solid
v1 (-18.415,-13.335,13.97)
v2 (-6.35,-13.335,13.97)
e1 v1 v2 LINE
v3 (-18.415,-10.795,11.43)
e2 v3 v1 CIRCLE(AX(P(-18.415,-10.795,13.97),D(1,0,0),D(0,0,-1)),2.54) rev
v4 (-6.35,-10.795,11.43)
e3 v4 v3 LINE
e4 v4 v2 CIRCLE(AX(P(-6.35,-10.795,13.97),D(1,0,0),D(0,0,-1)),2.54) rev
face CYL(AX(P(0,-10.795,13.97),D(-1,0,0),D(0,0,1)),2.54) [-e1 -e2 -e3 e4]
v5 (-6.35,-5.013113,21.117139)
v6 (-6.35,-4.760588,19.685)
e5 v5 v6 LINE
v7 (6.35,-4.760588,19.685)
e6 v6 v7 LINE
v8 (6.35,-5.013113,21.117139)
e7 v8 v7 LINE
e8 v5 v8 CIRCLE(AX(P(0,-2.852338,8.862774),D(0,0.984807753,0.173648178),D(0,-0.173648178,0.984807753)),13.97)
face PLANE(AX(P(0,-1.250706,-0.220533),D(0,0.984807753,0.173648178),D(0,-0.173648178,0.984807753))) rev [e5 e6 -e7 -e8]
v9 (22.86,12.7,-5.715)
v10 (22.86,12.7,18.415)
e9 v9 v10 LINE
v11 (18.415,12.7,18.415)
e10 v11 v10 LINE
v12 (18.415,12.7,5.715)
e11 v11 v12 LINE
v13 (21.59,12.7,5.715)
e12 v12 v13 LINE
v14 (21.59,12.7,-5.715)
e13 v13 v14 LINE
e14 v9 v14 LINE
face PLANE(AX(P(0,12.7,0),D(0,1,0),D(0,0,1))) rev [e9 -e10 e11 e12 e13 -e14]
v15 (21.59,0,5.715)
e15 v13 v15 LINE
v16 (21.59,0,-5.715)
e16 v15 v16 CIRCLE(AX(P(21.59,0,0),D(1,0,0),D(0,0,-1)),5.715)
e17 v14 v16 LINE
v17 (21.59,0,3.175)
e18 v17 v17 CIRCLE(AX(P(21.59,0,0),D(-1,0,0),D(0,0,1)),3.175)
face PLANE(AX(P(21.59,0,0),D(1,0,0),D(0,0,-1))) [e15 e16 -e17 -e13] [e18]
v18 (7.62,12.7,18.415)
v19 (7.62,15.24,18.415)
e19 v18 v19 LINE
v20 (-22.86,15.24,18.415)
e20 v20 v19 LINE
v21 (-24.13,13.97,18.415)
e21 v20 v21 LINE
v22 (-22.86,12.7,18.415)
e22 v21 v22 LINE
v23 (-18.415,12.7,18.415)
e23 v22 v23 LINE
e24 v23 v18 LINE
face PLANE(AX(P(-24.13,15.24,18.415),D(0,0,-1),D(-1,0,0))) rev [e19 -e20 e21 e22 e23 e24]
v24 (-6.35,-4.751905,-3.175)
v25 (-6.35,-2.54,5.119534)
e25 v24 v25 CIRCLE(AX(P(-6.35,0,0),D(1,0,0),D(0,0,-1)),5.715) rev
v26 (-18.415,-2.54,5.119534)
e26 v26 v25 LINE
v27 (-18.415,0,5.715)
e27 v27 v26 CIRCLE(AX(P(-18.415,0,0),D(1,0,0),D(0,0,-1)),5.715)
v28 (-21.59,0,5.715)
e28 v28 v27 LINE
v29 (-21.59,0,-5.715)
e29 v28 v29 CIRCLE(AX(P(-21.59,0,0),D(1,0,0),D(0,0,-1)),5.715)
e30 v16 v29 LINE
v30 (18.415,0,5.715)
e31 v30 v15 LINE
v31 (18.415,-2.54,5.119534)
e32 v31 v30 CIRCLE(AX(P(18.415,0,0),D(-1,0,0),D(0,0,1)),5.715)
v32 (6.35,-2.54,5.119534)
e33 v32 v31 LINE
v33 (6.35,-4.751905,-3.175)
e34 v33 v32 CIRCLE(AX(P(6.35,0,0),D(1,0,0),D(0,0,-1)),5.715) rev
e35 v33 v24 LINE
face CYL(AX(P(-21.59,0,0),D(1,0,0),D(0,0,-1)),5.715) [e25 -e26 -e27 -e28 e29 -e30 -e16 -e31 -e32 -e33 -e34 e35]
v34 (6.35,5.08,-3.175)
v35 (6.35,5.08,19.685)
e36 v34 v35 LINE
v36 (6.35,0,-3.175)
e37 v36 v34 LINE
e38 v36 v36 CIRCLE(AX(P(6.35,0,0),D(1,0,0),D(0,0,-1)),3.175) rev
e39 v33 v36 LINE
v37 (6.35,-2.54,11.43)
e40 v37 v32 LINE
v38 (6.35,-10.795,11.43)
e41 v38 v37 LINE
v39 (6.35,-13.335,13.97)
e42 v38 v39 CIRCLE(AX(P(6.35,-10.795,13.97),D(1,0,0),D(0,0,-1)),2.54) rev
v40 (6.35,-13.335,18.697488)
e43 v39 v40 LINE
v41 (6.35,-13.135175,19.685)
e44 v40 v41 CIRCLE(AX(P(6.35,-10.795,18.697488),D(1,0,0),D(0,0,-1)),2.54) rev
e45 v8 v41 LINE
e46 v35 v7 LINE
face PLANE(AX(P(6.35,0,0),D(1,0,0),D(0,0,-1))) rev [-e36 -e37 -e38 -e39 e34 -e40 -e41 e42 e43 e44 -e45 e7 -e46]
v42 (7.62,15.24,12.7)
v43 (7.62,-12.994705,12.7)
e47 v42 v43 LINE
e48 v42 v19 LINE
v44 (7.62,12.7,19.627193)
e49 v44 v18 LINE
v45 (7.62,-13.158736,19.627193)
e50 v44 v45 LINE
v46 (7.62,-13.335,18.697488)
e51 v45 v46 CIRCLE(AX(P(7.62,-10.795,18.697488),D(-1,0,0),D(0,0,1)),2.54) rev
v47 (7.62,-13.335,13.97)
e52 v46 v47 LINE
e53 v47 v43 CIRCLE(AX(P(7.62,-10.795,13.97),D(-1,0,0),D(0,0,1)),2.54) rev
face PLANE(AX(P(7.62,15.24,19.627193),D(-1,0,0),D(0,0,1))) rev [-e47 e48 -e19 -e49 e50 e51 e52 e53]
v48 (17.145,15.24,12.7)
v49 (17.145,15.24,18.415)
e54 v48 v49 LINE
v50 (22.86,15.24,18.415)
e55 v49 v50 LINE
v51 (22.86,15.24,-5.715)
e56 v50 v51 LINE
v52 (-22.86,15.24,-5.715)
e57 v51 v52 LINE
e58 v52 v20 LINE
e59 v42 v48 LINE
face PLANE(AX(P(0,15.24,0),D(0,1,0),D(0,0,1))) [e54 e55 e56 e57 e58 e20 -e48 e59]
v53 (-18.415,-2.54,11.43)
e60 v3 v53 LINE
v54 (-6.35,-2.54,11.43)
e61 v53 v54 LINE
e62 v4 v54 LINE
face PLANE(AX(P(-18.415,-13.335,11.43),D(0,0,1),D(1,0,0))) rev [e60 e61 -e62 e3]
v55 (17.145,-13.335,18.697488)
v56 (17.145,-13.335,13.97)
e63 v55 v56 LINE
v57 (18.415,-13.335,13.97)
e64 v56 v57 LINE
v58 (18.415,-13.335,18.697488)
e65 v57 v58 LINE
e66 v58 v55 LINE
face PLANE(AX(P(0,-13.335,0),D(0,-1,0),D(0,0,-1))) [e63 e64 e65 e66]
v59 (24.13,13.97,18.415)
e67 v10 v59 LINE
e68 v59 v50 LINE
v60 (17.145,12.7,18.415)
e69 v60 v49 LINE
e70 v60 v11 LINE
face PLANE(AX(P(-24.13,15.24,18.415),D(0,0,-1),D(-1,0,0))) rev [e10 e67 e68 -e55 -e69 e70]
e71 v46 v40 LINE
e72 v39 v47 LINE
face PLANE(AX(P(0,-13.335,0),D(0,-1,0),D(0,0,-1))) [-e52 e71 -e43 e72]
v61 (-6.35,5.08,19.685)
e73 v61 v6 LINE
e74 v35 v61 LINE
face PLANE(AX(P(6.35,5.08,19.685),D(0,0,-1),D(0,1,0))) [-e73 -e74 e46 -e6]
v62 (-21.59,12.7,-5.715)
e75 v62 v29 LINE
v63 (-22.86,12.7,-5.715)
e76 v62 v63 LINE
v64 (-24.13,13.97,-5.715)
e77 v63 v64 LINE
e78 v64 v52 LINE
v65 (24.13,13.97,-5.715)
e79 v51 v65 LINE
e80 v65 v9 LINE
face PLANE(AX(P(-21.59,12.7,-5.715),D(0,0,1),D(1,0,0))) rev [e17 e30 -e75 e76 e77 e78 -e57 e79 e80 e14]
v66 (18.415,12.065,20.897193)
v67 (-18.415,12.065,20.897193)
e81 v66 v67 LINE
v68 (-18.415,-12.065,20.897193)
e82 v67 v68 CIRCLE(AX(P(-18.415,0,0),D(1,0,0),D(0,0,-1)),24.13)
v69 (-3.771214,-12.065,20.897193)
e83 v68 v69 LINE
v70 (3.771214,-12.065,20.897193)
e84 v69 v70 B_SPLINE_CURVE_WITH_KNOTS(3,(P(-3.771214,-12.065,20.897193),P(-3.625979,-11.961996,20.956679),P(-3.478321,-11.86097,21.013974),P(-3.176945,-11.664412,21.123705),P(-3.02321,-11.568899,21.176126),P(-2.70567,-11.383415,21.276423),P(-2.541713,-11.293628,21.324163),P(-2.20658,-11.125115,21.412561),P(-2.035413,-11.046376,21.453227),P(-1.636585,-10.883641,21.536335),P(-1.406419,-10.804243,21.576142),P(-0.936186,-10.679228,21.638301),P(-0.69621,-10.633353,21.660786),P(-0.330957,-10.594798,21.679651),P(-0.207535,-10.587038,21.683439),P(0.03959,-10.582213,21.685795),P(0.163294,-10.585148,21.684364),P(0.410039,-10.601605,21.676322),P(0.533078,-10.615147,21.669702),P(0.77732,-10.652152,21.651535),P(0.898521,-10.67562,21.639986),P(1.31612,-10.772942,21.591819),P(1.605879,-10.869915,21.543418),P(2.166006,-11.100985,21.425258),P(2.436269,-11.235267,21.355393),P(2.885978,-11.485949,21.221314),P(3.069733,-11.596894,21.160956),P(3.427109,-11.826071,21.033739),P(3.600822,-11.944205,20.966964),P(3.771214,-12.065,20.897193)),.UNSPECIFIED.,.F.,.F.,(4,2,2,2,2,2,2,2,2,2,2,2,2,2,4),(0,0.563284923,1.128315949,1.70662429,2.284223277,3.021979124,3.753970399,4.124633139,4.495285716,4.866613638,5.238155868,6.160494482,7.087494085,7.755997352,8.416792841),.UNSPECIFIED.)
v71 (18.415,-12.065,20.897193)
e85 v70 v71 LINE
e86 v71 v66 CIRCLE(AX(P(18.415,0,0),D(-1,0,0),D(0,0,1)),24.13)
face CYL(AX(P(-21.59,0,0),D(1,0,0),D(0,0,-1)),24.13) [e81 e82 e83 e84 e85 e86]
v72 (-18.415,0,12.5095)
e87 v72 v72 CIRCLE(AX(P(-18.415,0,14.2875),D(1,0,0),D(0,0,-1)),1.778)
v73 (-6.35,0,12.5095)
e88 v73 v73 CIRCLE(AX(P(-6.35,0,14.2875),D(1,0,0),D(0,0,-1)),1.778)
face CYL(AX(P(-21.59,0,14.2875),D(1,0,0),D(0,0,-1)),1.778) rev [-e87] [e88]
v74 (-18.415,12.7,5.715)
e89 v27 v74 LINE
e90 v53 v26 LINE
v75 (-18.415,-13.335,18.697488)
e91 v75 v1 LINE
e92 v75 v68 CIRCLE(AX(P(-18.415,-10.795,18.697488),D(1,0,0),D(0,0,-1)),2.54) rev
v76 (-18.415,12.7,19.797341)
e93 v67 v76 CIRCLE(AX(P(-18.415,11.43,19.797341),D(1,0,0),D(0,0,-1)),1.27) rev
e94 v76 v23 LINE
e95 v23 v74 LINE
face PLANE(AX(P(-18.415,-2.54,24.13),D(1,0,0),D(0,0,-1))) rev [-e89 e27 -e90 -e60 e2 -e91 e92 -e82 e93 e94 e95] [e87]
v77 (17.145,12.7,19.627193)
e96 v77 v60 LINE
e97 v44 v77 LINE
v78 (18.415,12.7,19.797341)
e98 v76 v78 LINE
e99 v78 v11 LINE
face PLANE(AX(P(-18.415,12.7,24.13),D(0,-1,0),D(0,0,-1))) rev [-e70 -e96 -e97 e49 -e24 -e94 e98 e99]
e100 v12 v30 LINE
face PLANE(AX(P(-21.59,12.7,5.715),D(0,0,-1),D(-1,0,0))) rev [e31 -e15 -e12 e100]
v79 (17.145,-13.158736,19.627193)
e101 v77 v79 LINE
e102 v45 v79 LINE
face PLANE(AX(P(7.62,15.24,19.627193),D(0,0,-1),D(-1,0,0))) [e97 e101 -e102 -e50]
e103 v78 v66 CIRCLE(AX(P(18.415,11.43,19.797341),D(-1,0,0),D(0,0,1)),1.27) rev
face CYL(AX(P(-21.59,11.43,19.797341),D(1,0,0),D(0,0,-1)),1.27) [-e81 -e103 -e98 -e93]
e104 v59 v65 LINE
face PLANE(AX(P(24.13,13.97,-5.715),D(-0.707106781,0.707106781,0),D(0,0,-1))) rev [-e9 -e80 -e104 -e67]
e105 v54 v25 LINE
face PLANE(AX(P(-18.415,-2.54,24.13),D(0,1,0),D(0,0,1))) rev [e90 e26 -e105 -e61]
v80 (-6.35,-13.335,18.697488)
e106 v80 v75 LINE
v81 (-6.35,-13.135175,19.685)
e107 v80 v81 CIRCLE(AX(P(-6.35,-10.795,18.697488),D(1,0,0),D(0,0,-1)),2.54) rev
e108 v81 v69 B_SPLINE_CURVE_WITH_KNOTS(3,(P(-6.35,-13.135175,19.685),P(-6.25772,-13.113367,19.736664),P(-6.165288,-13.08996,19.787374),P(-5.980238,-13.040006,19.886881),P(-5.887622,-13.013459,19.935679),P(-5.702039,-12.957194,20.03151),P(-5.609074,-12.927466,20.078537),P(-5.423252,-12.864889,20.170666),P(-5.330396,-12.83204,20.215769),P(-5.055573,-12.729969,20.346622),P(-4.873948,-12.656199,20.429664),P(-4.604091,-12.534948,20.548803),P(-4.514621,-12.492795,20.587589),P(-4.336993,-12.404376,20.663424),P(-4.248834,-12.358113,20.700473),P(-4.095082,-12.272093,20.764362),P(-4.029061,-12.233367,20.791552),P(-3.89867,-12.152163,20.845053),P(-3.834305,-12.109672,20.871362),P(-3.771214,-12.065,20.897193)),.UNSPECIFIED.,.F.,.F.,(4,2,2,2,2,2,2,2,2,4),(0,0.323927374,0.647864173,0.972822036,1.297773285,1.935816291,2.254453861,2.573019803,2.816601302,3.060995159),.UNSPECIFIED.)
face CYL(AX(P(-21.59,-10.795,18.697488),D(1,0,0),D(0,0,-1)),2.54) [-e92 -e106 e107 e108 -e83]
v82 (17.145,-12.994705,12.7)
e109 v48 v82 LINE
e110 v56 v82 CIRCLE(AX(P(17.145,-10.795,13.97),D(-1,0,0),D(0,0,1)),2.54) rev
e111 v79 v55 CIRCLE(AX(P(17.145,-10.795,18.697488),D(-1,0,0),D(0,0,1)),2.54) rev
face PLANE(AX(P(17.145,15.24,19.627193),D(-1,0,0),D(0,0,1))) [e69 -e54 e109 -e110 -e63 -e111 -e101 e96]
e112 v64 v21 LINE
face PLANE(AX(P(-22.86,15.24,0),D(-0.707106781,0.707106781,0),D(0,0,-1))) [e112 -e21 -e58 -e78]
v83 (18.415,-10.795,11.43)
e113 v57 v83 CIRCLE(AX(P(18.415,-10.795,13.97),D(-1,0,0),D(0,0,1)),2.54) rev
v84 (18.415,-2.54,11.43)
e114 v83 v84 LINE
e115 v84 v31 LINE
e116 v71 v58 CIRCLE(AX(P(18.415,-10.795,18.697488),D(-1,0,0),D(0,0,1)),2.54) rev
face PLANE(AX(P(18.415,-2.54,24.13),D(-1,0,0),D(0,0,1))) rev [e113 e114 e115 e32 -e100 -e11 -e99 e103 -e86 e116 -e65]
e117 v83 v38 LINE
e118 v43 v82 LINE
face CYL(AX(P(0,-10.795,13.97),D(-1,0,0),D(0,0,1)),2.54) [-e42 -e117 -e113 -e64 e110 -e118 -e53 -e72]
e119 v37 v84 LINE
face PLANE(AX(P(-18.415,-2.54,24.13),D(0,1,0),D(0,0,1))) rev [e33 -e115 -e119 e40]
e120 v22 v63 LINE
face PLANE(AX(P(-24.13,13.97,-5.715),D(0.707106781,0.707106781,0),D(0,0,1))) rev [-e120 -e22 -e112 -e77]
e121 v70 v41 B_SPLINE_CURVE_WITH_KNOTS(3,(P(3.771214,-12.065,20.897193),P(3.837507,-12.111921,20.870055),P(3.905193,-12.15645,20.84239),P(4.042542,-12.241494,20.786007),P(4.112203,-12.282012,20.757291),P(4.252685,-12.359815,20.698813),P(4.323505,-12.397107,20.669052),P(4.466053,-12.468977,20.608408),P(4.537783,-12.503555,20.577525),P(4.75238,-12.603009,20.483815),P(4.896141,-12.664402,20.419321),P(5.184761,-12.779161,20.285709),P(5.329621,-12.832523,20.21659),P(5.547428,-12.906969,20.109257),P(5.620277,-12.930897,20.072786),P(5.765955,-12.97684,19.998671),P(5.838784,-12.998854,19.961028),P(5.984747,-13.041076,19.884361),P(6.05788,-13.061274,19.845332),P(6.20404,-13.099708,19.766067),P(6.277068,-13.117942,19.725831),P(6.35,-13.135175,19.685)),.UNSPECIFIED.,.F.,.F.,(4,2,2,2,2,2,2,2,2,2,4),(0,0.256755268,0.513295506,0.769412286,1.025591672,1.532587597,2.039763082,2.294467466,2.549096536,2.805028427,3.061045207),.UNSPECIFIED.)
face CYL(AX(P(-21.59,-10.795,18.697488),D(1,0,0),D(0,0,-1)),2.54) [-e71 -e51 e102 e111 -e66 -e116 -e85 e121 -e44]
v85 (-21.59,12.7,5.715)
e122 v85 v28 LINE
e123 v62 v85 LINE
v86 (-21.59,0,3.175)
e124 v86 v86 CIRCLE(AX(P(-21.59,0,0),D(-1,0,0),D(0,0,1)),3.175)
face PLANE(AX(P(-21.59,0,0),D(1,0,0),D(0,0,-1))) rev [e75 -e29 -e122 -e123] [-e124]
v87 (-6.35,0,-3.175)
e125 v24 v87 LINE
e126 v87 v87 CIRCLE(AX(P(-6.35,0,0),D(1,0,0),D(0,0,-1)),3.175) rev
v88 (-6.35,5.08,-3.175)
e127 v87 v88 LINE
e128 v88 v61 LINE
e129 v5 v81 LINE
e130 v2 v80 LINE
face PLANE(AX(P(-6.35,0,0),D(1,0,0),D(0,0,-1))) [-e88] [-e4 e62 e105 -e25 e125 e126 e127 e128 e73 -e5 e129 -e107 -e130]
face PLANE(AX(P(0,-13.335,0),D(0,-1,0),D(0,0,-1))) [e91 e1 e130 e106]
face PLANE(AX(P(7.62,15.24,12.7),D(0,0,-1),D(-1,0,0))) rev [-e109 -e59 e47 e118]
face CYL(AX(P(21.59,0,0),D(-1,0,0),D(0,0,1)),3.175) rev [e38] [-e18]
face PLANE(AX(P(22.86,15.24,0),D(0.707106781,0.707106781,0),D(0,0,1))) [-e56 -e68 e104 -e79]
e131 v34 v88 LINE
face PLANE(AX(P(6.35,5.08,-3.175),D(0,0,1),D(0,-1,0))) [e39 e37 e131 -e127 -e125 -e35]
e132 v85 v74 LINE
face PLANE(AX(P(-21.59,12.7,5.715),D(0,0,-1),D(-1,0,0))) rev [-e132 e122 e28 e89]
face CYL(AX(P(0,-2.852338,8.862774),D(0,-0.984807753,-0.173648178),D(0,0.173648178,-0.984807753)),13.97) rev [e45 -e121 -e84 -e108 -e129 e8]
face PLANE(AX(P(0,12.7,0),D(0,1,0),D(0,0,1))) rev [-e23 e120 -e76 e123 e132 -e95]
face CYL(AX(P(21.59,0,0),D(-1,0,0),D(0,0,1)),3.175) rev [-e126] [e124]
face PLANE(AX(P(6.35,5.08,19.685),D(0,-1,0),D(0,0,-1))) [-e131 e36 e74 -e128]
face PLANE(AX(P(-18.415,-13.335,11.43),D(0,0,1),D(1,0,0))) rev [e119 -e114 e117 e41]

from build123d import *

# Parameters (mm, degrees)
BOSS_EXTRUDE1_DEPTH      = 21.59
BOSS_EXTRUDE1_DEPTH_BACK = 21.59
SKETCH1_R                = 5.715
SKETCH3_W                = 43.18
SKETCH3_H                = 11.43
BOSS_EXTRUDE3_DEPTH      = 12.7
SKETCH4_W                = 36.83
SKETCH4_H                = 15.24
BOSS_EXTRUDE4_DEPTH      = 24.13
SKETCH7_W                = 36.83
SKETCH7_H                = 12.7
BOSS_EXTRUDE5_DEPTH      = 10.795
SKETCH5_R                = 3.175
CUT_EXTRUDE1_DEPTH       = 52.230767367
CUT_EXTRUDE5_DEPTH       = 52.230767367
FILLET1_R                = 2.54
CUT_EXTRUDE6_DEPTH       = 6.35
CUT_EXTRUDE6_DEPTH_BACK  = 6.35
SKETCH10_W               = 22.86
SKETCH10_H               = 25.4
SKETCH11_R               = 1.778
CUT_EXTRUDE7_DEPTH       = 36.017241825
SKETCH24_W               = 48.26
SKETCH24_H               = 24.13
BOSS_EXTRUDE6_DEPTH      = 2.54
SKETCH17_W               = 12.7
SKETCH17_H               = 3.175
CUT_EXTRUDE9_DEPTH       = 8.89
SKETCH18_W               = 9.525
SKETCH18_H               = 6.927192993
CUT_EXTRUDE13_DEPTH      = 45.508925283
CHAMFER1_SIZE            = 1.27
FILLET2_R                = 1.27


with BuildPart() as part:
    # Sketch1 → Boss-Extrude1 (new, two sides: drawn at the far end of the back side and taken through both)
    with BuildSketch(Plane(origin=(0, 0, 0), x_dir=(0, 0, -1), z_dir=(1, 0, 0)).offset(-BOSS_EXTRUDE1_DEPTH_BACK)):
        Circle(SKETCH1_R)
    extrude(amount=BOSS_EXTRUDE1_DEPTH + BOSS_EXTRUDE1_DEPTH_BACK)

    # Sketch3 → Boss-Extrude3 (add)
    with BuildSketch(Plane(origin=(0, 0, 0), x_dir=(1, 0, 0), z_dir=(0, 1, 0))):
        Rectangle(SKETCH3_W, SKETCH3_H)
    extrude(amount=BOSS_EXTRUDE3_DEPTH)


with BuildPart() as body_2:
    # Sketch4 → Boss-Extrude4 (new body)
    with BuildSketch(Plane.XY):
        with Locations((0, 5.08)):
            Rectangle(SKETCH4_W, SKETCH4_H)
    extrude(amount=BOSS_EXTRUDE4_DEPTH)


with BuildPart() as body_3:
    # Sketch7 → Boss-Extrude5 (new body)
    with BuildSketch(Plane.XZ.offset(2.54)):
        with Locations((0, 17.78)):
            Rectangle(SKETCH7_W, SKETCH7_H)
    extrude(amount=BOSS_EXTRUDE5_DEPTH)


with BuildPart() as cut_extrude1_tool:
    # Sketch5 → Cut-Extrude1 (new, through all)
    with BuildSketch(Plane.ZY.offset(21.59)):
        Circle(SKETCH5_R)
    extrude(amount=-CUT_EXTRUDE1_DEPTH)


with BuildPart() as part_1:
    add(part.part)

    # Cut-Extrude1: cut by cut_extrude1_tool
    add(cut_extrude1_tool.part, mode=Mode.SUBTRACT)


with BuildPart() as body_2_1:
    add(body_2.part)

    # Cut-Extrude1: cut by cut_extrude1_tool
    add(cut_extrude1_tool.part, mode=Mode.SUBTRACT)


with BuildPart() as cut_extrude5_tool:
    # Sketch6 → Cut-Extrude5 (new, through all)
    with BuildSketch(Plane(origin=(21.59, 0, 0), x_dir=(0, 0, -1), z_dir=(1, 0, 0))):
        with BuildLine():
            ThreePointArc((-19.445417037, -14.2875), (-24.13, 0), (-19.445417037, 14.2875))
            Line((-19.445417037, 14.2875), (-27.94, 14.2875))
            Line((-27.94, 14.2875), (-27.94, -14.2875))
            Line((-27.94, -14.2875), (-19.445417037, -14.2875))
        make_face()
    extrude(amount=-CUT_EXTRUDE5_DEPTH)


with BuildPart() as body_2_2:
    add(body_2_1.part)

    # Cut-Extrude5: cut by cut_extrude5_tool
    add(cut_extrude5_tool.part, mode=Mode.SUBTRACT)


with BuildPart() as body_3_1:
    add(body_3.part)

    # Cut-Extrude5: cut by cut_extrude5_tool
    add(cut_extrude5_tool.part, mode=Mode.SUBTRACT)

    # Fillet1
    fillet1_edges = [body_3_1.edges().sort_by_distance(p)[0] for p in [
        (0, -13.335, 20.11056128),
        (0, -13.335, 11.43),
    ]]
    fillet(fillet1_edges, radius=FILLET1_R)


with BuildPart() as cut_extrude6_tool:
    # Sketch10 → Cut-Extrude6 (new, two sides: drawn at the far end of the back side and taken through both)
    with BuildSketch(Plane(origin=(0, 0, 0), x_dir=(0, 0, -1), z_dir=(1, 0, 0)).offset(-CUT_EXTRUDE6_DEPTH_BACK)):
        with Locations((-8.255, -7.62)):
            Rectangle(SKETCH10_W, SKETCH10_H)
    extrude(amount=CUT_EXTRUDE6_DEPTH + CUT_EXTRUDE6_DEPTH_BACK)


with BuildPart() as part_2:
    add(part_1.part)

    # Cut-Extrude6: cut by cut_extrude6_tool
    add(cut_extrude6_tool.part, mode=Mode.SUBTRACT)


with BuildPart() as body_2_3:
    add(body_2_2.part)

    # Cut-Extrude6: cut by cut_extrude6_tool
    add(cut_extrude6_tool.part, mode=Mode.SUBTRACT)

    # Sketch11 → Cut-Extrude7 (cut, through all)
    with BuildSketch(Plane(origin=(0, 0, 0), x_dir=(0, 0, -1), z_dir=(1, 0, 0))):
        with Locations((-14.2875, 0)):
            Circle(SKETCH11_R)
    extrude(amount=-CUT_EXTRUDE7_DEPTH, mode=Mode.SUBTRACT)


with BuildPart() as body_3_2:
    add(body_3_1.part)

    # Cut-Extrude6: cut by cut_extrude6_tool
    add(cut_extrude6_tool.part, mode=Mode.SUBTRACT)


with BuildPart() as body_2_4:
    add(body_2_3.part)

    # Combine1: union body 3, part
    add(body_3_2.part)
    add(part_2.part)

    # Sketch24 → Boss-Extrude6 (add)
    with BuildSketch(Plane(origin=(0, 12.7, 0), x_dir=(1, 0, 0), z_dir=(0, 1, 0))):
        with Locations((0, -6.35)):
            Rectangle(SKETCH24_W, SKETCH24_H)
    extrude(amount=BOSS_EXTRUDE6_DEPTH)

    # Sketch17 → Cut-Extrude9 (cut)
    with BuildSketch(Plane(origin=(0, -10.005646771, -1.764265485), x_dir=(-1, 0, 0), z_dir=(0, 0.984807753012208, 0.17364817766693072))):
        with BuildLine():
            Line((-6.35, 21.666839892), (6.35, 21.666839892))
            ThreePointArc((6.35, 21.666839892), (0, 23.193431999), (-6.35, 21.666839892))
        make_face()
        with Locations((0, 20.079339892)):
            Rectangle(SKETCH17_W, SKETCH17_H)
    extrude(amount=CUT_EXTRUDE9_DEPTH, mode=Mode.SUBTRACT)

    # Sketch18 → Cut-Extrude13 (cut, through all)
    with BuildSketch(Plane(origin=(0, -13.335, 0), x_dir=(1, 0, 0), z_dir=(0, 1, 0))):
        with Locations((12.3825, -16.163596497)):
            Rectangle(SKETCH18_W, SKETCH18_H)
    extrude(amount=CUT_EXTRUDE13_DEPTH, mode=Mode.SUBTRACT)

    # Chamfer1
    chamfer1_edges = [body_2_4.edges().sort_by_distance(p)[0] for p in [
        (24.13, 15.24, 6.35),
        (24.13, 12.7, 6.35),
        (-24.13, 15.24, 6.35),
        (-24.13, 12.7, 6.35),
    ]]
    chamfer(chamfer1_edges, length=CHAMFER1_SIZE - 0.0001)  # a hair under: the kernel refuses the full size

    # Fillet2
    fillet2_edges = [body_2_4.edges().sort_by_distance(p)[0] for p in [
        (0, 12.7, 20.517477915),
    ]]
    fillet(fillet2_edges, radius=FILLET2_R)


solid = body_2_4.part
